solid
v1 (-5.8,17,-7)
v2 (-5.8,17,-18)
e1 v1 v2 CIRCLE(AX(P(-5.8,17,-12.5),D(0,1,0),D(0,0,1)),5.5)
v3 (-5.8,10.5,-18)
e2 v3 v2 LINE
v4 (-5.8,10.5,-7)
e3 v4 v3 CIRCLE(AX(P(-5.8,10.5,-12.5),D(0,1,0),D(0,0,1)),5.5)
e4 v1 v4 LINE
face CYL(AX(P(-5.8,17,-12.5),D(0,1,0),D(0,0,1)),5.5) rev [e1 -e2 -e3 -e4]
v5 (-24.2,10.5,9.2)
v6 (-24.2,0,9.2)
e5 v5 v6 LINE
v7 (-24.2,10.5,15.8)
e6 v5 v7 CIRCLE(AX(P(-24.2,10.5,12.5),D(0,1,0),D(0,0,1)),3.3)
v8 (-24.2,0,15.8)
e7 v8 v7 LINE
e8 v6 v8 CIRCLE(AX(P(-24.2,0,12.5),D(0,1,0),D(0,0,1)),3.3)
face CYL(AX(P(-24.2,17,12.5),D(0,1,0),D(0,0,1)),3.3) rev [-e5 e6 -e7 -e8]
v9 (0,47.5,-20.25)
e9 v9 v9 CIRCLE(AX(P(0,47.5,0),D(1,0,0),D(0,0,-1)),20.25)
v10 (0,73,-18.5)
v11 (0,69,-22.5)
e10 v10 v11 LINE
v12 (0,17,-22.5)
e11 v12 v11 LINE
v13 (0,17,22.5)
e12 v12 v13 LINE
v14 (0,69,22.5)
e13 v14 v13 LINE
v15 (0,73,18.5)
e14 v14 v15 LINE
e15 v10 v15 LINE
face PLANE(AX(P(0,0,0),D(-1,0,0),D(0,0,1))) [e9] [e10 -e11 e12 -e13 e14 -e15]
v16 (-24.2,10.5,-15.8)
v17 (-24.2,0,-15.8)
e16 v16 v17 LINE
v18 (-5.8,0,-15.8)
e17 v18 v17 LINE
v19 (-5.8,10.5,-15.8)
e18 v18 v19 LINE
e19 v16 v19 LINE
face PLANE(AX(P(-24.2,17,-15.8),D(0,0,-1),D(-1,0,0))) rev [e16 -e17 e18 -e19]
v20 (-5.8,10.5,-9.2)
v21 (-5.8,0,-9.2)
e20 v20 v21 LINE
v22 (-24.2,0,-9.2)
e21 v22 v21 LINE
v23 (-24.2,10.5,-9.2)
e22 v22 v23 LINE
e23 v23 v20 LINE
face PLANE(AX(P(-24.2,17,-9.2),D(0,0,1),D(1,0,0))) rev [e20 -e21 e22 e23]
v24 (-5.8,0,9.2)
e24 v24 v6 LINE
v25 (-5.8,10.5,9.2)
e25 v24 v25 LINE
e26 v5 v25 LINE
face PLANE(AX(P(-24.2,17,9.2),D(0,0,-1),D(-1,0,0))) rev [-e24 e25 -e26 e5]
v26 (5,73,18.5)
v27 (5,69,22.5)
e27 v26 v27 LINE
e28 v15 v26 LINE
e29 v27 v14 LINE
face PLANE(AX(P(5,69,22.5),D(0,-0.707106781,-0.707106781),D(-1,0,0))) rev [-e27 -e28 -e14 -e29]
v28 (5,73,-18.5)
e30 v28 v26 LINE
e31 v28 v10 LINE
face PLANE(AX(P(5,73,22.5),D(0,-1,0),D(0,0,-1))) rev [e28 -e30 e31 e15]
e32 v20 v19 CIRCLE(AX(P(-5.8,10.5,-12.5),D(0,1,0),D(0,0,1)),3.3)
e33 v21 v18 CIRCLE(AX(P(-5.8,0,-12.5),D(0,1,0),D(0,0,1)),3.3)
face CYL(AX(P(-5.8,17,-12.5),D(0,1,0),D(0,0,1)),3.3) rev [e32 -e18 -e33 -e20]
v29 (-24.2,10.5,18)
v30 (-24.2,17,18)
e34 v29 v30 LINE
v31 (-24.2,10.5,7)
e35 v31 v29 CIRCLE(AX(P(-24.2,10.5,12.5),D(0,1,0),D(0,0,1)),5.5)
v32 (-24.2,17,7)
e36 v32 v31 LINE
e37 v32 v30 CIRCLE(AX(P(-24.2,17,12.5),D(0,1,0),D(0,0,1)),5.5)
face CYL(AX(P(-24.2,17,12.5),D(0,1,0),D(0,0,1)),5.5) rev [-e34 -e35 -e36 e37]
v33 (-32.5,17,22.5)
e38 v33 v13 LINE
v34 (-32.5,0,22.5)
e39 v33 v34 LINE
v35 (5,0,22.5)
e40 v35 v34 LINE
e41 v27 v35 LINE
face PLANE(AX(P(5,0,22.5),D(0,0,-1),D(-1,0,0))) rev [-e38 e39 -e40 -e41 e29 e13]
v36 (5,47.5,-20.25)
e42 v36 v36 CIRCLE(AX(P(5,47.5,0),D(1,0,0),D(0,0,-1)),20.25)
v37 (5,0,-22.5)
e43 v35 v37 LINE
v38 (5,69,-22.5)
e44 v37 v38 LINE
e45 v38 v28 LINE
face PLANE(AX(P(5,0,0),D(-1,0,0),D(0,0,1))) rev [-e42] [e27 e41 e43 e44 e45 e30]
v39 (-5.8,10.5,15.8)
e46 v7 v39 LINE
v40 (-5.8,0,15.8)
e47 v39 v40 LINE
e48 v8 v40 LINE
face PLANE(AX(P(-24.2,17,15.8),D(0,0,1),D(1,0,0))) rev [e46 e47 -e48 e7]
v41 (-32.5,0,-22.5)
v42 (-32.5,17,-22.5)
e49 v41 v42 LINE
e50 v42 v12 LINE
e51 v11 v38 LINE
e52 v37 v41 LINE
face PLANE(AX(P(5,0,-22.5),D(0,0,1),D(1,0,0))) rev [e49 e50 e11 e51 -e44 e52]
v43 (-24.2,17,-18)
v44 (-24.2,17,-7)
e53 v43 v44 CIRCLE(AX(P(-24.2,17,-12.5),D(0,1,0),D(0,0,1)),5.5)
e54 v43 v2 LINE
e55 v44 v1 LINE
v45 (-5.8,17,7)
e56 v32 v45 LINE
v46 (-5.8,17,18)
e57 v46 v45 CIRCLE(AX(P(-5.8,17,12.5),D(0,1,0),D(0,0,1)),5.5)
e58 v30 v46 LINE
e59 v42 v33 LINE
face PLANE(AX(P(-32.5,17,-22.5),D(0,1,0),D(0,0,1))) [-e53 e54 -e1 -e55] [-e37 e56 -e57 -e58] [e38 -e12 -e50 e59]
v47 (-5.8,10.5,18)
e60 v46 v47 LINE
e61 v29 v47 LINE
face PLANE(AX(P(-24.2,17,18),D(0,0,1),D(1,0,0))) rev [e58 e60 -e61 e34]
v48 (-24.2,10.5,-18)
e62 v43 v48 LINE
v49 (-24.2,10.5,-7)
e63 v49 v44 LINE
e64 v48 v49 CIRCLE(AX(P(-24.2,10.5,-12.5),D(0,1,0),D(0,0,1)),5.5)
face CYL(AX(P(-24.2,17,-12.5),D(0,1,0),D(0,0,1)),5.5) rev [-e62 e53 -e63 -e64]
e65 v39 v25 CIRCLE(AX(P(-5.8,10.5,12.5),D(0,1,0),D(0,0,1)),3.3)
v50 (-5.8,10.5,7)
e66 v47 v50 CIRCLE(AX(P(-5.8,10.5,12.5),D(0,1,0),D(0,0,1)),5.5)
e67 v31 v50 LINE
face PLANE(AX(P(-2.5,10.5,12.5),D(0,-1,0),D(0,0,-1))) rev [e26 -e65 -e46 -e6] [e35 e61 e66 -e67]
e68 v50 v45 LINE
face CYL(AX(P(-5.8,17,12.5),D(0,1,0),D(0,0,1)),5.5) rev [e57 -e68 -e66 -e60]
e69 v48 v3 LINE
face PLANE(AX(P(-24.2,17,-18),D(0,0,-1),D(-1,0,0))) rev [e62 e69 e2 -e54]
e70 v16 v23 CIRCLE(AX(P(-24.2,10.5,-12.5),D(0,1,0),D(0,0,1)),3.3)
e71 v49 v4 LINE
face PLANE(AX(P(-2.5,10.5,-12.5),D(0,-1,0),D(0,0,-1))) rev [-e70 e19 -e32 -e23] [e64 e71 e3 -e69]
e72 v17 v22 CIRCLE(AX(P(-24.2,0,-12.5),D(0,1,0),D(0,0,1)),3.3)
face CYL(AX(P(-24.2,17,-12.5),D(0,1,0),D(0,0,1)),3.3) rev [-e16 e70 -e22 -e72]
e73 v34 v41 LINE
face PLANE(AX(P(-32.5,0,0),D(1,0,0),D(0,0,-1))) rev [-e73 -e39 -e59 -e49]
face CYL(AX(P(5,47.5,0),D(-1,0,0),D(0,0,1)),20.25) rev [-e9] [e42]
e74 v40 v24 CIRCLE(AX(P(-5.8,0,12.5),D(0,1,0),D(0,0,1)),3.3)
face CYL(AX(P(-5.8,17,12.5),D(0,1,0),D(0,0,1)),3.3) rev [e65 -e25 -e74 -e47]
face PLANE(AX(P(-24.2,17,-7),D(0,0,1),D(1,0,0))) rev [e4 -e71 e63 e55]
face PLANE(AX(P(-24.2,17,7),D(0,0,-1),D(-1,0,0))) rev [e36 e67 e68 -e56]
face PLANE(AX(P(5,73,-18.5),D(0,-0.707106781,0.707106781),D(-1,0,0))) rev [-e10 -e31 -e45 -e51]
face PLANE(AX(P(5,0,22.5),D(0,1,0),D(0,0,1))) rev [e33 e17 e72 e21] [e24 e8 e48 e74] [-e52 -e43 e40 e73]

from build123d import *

# Parameters (mm, degrees)
SKETCH1_W                                      = 45
SKETCH1_H                                      = 73
SKETCH1_R                                      = 20.25
BOSS_EXTRUDE1_DEPTH                            = 5
CHAMFER1_SIZE                                  = 4
SKETCH2_W                                      = 45
SKETCH2_H                                      = 17
BOSS_EXTRUDE2_DEPTH                            = 32.5
CBORE_SLOT_FOR_M6_HEX_SOCKET_HEAD_CAP_SC_DEPTH = 17
CBORE_START                                    = 10.5
CBORE_SLOT_FOR_M6_HEX_SOCKET_HEAD_CA_3_DEPTH   = 6.5


# Read off the part's stored shape, not the designer's step: CBORE SLOT for M6 Hex Socket Head Cap Screw1
with BuildPart() as part:
    # Sketch1 → Boss-Extrude1 (new body)
    with BuildSketch(Plane(origin=(0, 0, 0), x_dir=(0, 0, -1), z_dir=(1, 0, 0))):
        with Locations((0, 36.5)):
            Rectangle(SKETCH1_W, SKETCH1_H)
        with Locations((0, 47.5)):
            Circle(SKETCH1_R, mode=Mode.SUBTRACT)
    extrude(amount=BOSS_EXTRUDE1_DEPTH)

    # Chamfer1
    chamfer1_edges = [part.edges().sort_by_distance(p)[0] for p in [
        (2.5, 73, 22.5),
        (2.5, 73, -22.5),
    ]]
    chamfer(chamfer1_edges, length=CHAMFER1_SIZE)

    # Sketch2 → Boss-Extrude2 (add)
    with BuildSketch(Plane.ZY):
        with Locations((0, 8.5)):
            Rectangle(SKETCH2_W, SKETCH2_H)
    extrude(amount=BOSS_EXTRUDE2_DEPTH)

    # CBORE SLOT for M6 Hex Socket Head Ca 2 → CBORE SLOT for M6 Hex Socket Head Cap Screw1 (cut)
    with BuildSketch(Plane(origin=(0, 0, 0), x_dir=(1, 0, 0), z_dir=(0, 1, 0))):
        with BuildLine():
            Line((-24.2, -15.8), (-5.8, -15.8))
            ThreePointArc((-5.8, -15.8), (-2.5, -12.5), (-5.8, -9.2))
            Line((-5.8, -9.2), (-24.2, -9.2))
            ThreePointArc((-24.2, -9.2), (-27.5, -12.5), (-24.2, -15.8))
        make_face()
        with BuildLine():
            Line((-24.2, 9.2), (-5.8, 9.2))
            ThreePointArc((-5.8, 9.2), (-2.5, 12.5), (-5.8, 15.8))
            Line((-5.8, 15.8), (-24.2, 15.8))
            ThreePointArc((-24.2, 15.8), (-27.5, 12.5), (-24.2, 9.2))
        make_face()
    extrude(amount=CBORE_SLOT_FOR_M6_HEX_SOCKET_HEAD_CAP_SC_DEPTH, mode=Mode.SUBTRACT)

    # CBORE SLOT for M6 Hex Socket Head Ca 3 o → CBORE SLOT for M6 Hex Socket Head Ca 3 (cut)
    # profile 1 of 2: a face of its own
    with BuildSketch(Plane(origin=(0, 0, 0), x_dir=(1, 0, 0), z_dir=(0, 1, 0)).offset(CBORE_START)):
        with BuildLine():
            Line((-24.2, -18), (-5.8, -18))
            ThreePointArc((-5.8, -18), (-0.3, -12.5), (-5.8, -7))
            Line((-5.8, -7), (-24.2, -7))
            ThreePointArc((-24.2, -7), (-29.7, -12.5), (-24.2, -18))
        make_face()
        with BuildLine():
            ThreePointArc((-5.8, -9.2), (-2.5, -12.5), (-5.8, -15.8))
            Line((-5.8, -15.8), (-24.2, -15.8))
            ThreePointArc((-24.2, -15.8), (-27.5, -12.5), (-24.2, -9.2))
            Line((-24.2, -9.2), (-5.8, -9.2))
        make_face(mode=Mode.SUBTRACT)
    # profile 2 of 2: a face of its own
    with BuildSketch(Plane(origin=(0, 0, 0), x_dir=(1, 0, 0), z_dir=(0, 1, 0)).offset(CBORE_START)):
        with BuildLine():
            Line((-24.2, 7), (-5.8, 7))
            ThreePointArc((-5.8, 7), (-0.3, 12.5), (-5.8, 18))
            Line((-5.8, 18), (-24.2, 18))
            ThreePointArc((-24.2, 18), (-29.7, 12.5), (-24.2, 7))
        make_face()
        with BuildLine():
            ThreePointArc((-5.8, 15.8), (-2.5, 12.5), (-5.8, 9.2))
            Line((-5.8, 9.2), (-24.2, 9.2))
            ThreePointArc((-24.2, 9.2), (-27.5, 12.5), (-24.2, 15.8))
            Line((-24.2, 15.8), (-5.8, 15.8))
        make_face(mode=Mode.SUBTRACT)
    extrude(amount=CBORE_SLOT_FOR_M6_HEX_SOCKET_HEAD_CA_3_DEPTH, mode=Mode.SUBTRACT)


solid = part.part
